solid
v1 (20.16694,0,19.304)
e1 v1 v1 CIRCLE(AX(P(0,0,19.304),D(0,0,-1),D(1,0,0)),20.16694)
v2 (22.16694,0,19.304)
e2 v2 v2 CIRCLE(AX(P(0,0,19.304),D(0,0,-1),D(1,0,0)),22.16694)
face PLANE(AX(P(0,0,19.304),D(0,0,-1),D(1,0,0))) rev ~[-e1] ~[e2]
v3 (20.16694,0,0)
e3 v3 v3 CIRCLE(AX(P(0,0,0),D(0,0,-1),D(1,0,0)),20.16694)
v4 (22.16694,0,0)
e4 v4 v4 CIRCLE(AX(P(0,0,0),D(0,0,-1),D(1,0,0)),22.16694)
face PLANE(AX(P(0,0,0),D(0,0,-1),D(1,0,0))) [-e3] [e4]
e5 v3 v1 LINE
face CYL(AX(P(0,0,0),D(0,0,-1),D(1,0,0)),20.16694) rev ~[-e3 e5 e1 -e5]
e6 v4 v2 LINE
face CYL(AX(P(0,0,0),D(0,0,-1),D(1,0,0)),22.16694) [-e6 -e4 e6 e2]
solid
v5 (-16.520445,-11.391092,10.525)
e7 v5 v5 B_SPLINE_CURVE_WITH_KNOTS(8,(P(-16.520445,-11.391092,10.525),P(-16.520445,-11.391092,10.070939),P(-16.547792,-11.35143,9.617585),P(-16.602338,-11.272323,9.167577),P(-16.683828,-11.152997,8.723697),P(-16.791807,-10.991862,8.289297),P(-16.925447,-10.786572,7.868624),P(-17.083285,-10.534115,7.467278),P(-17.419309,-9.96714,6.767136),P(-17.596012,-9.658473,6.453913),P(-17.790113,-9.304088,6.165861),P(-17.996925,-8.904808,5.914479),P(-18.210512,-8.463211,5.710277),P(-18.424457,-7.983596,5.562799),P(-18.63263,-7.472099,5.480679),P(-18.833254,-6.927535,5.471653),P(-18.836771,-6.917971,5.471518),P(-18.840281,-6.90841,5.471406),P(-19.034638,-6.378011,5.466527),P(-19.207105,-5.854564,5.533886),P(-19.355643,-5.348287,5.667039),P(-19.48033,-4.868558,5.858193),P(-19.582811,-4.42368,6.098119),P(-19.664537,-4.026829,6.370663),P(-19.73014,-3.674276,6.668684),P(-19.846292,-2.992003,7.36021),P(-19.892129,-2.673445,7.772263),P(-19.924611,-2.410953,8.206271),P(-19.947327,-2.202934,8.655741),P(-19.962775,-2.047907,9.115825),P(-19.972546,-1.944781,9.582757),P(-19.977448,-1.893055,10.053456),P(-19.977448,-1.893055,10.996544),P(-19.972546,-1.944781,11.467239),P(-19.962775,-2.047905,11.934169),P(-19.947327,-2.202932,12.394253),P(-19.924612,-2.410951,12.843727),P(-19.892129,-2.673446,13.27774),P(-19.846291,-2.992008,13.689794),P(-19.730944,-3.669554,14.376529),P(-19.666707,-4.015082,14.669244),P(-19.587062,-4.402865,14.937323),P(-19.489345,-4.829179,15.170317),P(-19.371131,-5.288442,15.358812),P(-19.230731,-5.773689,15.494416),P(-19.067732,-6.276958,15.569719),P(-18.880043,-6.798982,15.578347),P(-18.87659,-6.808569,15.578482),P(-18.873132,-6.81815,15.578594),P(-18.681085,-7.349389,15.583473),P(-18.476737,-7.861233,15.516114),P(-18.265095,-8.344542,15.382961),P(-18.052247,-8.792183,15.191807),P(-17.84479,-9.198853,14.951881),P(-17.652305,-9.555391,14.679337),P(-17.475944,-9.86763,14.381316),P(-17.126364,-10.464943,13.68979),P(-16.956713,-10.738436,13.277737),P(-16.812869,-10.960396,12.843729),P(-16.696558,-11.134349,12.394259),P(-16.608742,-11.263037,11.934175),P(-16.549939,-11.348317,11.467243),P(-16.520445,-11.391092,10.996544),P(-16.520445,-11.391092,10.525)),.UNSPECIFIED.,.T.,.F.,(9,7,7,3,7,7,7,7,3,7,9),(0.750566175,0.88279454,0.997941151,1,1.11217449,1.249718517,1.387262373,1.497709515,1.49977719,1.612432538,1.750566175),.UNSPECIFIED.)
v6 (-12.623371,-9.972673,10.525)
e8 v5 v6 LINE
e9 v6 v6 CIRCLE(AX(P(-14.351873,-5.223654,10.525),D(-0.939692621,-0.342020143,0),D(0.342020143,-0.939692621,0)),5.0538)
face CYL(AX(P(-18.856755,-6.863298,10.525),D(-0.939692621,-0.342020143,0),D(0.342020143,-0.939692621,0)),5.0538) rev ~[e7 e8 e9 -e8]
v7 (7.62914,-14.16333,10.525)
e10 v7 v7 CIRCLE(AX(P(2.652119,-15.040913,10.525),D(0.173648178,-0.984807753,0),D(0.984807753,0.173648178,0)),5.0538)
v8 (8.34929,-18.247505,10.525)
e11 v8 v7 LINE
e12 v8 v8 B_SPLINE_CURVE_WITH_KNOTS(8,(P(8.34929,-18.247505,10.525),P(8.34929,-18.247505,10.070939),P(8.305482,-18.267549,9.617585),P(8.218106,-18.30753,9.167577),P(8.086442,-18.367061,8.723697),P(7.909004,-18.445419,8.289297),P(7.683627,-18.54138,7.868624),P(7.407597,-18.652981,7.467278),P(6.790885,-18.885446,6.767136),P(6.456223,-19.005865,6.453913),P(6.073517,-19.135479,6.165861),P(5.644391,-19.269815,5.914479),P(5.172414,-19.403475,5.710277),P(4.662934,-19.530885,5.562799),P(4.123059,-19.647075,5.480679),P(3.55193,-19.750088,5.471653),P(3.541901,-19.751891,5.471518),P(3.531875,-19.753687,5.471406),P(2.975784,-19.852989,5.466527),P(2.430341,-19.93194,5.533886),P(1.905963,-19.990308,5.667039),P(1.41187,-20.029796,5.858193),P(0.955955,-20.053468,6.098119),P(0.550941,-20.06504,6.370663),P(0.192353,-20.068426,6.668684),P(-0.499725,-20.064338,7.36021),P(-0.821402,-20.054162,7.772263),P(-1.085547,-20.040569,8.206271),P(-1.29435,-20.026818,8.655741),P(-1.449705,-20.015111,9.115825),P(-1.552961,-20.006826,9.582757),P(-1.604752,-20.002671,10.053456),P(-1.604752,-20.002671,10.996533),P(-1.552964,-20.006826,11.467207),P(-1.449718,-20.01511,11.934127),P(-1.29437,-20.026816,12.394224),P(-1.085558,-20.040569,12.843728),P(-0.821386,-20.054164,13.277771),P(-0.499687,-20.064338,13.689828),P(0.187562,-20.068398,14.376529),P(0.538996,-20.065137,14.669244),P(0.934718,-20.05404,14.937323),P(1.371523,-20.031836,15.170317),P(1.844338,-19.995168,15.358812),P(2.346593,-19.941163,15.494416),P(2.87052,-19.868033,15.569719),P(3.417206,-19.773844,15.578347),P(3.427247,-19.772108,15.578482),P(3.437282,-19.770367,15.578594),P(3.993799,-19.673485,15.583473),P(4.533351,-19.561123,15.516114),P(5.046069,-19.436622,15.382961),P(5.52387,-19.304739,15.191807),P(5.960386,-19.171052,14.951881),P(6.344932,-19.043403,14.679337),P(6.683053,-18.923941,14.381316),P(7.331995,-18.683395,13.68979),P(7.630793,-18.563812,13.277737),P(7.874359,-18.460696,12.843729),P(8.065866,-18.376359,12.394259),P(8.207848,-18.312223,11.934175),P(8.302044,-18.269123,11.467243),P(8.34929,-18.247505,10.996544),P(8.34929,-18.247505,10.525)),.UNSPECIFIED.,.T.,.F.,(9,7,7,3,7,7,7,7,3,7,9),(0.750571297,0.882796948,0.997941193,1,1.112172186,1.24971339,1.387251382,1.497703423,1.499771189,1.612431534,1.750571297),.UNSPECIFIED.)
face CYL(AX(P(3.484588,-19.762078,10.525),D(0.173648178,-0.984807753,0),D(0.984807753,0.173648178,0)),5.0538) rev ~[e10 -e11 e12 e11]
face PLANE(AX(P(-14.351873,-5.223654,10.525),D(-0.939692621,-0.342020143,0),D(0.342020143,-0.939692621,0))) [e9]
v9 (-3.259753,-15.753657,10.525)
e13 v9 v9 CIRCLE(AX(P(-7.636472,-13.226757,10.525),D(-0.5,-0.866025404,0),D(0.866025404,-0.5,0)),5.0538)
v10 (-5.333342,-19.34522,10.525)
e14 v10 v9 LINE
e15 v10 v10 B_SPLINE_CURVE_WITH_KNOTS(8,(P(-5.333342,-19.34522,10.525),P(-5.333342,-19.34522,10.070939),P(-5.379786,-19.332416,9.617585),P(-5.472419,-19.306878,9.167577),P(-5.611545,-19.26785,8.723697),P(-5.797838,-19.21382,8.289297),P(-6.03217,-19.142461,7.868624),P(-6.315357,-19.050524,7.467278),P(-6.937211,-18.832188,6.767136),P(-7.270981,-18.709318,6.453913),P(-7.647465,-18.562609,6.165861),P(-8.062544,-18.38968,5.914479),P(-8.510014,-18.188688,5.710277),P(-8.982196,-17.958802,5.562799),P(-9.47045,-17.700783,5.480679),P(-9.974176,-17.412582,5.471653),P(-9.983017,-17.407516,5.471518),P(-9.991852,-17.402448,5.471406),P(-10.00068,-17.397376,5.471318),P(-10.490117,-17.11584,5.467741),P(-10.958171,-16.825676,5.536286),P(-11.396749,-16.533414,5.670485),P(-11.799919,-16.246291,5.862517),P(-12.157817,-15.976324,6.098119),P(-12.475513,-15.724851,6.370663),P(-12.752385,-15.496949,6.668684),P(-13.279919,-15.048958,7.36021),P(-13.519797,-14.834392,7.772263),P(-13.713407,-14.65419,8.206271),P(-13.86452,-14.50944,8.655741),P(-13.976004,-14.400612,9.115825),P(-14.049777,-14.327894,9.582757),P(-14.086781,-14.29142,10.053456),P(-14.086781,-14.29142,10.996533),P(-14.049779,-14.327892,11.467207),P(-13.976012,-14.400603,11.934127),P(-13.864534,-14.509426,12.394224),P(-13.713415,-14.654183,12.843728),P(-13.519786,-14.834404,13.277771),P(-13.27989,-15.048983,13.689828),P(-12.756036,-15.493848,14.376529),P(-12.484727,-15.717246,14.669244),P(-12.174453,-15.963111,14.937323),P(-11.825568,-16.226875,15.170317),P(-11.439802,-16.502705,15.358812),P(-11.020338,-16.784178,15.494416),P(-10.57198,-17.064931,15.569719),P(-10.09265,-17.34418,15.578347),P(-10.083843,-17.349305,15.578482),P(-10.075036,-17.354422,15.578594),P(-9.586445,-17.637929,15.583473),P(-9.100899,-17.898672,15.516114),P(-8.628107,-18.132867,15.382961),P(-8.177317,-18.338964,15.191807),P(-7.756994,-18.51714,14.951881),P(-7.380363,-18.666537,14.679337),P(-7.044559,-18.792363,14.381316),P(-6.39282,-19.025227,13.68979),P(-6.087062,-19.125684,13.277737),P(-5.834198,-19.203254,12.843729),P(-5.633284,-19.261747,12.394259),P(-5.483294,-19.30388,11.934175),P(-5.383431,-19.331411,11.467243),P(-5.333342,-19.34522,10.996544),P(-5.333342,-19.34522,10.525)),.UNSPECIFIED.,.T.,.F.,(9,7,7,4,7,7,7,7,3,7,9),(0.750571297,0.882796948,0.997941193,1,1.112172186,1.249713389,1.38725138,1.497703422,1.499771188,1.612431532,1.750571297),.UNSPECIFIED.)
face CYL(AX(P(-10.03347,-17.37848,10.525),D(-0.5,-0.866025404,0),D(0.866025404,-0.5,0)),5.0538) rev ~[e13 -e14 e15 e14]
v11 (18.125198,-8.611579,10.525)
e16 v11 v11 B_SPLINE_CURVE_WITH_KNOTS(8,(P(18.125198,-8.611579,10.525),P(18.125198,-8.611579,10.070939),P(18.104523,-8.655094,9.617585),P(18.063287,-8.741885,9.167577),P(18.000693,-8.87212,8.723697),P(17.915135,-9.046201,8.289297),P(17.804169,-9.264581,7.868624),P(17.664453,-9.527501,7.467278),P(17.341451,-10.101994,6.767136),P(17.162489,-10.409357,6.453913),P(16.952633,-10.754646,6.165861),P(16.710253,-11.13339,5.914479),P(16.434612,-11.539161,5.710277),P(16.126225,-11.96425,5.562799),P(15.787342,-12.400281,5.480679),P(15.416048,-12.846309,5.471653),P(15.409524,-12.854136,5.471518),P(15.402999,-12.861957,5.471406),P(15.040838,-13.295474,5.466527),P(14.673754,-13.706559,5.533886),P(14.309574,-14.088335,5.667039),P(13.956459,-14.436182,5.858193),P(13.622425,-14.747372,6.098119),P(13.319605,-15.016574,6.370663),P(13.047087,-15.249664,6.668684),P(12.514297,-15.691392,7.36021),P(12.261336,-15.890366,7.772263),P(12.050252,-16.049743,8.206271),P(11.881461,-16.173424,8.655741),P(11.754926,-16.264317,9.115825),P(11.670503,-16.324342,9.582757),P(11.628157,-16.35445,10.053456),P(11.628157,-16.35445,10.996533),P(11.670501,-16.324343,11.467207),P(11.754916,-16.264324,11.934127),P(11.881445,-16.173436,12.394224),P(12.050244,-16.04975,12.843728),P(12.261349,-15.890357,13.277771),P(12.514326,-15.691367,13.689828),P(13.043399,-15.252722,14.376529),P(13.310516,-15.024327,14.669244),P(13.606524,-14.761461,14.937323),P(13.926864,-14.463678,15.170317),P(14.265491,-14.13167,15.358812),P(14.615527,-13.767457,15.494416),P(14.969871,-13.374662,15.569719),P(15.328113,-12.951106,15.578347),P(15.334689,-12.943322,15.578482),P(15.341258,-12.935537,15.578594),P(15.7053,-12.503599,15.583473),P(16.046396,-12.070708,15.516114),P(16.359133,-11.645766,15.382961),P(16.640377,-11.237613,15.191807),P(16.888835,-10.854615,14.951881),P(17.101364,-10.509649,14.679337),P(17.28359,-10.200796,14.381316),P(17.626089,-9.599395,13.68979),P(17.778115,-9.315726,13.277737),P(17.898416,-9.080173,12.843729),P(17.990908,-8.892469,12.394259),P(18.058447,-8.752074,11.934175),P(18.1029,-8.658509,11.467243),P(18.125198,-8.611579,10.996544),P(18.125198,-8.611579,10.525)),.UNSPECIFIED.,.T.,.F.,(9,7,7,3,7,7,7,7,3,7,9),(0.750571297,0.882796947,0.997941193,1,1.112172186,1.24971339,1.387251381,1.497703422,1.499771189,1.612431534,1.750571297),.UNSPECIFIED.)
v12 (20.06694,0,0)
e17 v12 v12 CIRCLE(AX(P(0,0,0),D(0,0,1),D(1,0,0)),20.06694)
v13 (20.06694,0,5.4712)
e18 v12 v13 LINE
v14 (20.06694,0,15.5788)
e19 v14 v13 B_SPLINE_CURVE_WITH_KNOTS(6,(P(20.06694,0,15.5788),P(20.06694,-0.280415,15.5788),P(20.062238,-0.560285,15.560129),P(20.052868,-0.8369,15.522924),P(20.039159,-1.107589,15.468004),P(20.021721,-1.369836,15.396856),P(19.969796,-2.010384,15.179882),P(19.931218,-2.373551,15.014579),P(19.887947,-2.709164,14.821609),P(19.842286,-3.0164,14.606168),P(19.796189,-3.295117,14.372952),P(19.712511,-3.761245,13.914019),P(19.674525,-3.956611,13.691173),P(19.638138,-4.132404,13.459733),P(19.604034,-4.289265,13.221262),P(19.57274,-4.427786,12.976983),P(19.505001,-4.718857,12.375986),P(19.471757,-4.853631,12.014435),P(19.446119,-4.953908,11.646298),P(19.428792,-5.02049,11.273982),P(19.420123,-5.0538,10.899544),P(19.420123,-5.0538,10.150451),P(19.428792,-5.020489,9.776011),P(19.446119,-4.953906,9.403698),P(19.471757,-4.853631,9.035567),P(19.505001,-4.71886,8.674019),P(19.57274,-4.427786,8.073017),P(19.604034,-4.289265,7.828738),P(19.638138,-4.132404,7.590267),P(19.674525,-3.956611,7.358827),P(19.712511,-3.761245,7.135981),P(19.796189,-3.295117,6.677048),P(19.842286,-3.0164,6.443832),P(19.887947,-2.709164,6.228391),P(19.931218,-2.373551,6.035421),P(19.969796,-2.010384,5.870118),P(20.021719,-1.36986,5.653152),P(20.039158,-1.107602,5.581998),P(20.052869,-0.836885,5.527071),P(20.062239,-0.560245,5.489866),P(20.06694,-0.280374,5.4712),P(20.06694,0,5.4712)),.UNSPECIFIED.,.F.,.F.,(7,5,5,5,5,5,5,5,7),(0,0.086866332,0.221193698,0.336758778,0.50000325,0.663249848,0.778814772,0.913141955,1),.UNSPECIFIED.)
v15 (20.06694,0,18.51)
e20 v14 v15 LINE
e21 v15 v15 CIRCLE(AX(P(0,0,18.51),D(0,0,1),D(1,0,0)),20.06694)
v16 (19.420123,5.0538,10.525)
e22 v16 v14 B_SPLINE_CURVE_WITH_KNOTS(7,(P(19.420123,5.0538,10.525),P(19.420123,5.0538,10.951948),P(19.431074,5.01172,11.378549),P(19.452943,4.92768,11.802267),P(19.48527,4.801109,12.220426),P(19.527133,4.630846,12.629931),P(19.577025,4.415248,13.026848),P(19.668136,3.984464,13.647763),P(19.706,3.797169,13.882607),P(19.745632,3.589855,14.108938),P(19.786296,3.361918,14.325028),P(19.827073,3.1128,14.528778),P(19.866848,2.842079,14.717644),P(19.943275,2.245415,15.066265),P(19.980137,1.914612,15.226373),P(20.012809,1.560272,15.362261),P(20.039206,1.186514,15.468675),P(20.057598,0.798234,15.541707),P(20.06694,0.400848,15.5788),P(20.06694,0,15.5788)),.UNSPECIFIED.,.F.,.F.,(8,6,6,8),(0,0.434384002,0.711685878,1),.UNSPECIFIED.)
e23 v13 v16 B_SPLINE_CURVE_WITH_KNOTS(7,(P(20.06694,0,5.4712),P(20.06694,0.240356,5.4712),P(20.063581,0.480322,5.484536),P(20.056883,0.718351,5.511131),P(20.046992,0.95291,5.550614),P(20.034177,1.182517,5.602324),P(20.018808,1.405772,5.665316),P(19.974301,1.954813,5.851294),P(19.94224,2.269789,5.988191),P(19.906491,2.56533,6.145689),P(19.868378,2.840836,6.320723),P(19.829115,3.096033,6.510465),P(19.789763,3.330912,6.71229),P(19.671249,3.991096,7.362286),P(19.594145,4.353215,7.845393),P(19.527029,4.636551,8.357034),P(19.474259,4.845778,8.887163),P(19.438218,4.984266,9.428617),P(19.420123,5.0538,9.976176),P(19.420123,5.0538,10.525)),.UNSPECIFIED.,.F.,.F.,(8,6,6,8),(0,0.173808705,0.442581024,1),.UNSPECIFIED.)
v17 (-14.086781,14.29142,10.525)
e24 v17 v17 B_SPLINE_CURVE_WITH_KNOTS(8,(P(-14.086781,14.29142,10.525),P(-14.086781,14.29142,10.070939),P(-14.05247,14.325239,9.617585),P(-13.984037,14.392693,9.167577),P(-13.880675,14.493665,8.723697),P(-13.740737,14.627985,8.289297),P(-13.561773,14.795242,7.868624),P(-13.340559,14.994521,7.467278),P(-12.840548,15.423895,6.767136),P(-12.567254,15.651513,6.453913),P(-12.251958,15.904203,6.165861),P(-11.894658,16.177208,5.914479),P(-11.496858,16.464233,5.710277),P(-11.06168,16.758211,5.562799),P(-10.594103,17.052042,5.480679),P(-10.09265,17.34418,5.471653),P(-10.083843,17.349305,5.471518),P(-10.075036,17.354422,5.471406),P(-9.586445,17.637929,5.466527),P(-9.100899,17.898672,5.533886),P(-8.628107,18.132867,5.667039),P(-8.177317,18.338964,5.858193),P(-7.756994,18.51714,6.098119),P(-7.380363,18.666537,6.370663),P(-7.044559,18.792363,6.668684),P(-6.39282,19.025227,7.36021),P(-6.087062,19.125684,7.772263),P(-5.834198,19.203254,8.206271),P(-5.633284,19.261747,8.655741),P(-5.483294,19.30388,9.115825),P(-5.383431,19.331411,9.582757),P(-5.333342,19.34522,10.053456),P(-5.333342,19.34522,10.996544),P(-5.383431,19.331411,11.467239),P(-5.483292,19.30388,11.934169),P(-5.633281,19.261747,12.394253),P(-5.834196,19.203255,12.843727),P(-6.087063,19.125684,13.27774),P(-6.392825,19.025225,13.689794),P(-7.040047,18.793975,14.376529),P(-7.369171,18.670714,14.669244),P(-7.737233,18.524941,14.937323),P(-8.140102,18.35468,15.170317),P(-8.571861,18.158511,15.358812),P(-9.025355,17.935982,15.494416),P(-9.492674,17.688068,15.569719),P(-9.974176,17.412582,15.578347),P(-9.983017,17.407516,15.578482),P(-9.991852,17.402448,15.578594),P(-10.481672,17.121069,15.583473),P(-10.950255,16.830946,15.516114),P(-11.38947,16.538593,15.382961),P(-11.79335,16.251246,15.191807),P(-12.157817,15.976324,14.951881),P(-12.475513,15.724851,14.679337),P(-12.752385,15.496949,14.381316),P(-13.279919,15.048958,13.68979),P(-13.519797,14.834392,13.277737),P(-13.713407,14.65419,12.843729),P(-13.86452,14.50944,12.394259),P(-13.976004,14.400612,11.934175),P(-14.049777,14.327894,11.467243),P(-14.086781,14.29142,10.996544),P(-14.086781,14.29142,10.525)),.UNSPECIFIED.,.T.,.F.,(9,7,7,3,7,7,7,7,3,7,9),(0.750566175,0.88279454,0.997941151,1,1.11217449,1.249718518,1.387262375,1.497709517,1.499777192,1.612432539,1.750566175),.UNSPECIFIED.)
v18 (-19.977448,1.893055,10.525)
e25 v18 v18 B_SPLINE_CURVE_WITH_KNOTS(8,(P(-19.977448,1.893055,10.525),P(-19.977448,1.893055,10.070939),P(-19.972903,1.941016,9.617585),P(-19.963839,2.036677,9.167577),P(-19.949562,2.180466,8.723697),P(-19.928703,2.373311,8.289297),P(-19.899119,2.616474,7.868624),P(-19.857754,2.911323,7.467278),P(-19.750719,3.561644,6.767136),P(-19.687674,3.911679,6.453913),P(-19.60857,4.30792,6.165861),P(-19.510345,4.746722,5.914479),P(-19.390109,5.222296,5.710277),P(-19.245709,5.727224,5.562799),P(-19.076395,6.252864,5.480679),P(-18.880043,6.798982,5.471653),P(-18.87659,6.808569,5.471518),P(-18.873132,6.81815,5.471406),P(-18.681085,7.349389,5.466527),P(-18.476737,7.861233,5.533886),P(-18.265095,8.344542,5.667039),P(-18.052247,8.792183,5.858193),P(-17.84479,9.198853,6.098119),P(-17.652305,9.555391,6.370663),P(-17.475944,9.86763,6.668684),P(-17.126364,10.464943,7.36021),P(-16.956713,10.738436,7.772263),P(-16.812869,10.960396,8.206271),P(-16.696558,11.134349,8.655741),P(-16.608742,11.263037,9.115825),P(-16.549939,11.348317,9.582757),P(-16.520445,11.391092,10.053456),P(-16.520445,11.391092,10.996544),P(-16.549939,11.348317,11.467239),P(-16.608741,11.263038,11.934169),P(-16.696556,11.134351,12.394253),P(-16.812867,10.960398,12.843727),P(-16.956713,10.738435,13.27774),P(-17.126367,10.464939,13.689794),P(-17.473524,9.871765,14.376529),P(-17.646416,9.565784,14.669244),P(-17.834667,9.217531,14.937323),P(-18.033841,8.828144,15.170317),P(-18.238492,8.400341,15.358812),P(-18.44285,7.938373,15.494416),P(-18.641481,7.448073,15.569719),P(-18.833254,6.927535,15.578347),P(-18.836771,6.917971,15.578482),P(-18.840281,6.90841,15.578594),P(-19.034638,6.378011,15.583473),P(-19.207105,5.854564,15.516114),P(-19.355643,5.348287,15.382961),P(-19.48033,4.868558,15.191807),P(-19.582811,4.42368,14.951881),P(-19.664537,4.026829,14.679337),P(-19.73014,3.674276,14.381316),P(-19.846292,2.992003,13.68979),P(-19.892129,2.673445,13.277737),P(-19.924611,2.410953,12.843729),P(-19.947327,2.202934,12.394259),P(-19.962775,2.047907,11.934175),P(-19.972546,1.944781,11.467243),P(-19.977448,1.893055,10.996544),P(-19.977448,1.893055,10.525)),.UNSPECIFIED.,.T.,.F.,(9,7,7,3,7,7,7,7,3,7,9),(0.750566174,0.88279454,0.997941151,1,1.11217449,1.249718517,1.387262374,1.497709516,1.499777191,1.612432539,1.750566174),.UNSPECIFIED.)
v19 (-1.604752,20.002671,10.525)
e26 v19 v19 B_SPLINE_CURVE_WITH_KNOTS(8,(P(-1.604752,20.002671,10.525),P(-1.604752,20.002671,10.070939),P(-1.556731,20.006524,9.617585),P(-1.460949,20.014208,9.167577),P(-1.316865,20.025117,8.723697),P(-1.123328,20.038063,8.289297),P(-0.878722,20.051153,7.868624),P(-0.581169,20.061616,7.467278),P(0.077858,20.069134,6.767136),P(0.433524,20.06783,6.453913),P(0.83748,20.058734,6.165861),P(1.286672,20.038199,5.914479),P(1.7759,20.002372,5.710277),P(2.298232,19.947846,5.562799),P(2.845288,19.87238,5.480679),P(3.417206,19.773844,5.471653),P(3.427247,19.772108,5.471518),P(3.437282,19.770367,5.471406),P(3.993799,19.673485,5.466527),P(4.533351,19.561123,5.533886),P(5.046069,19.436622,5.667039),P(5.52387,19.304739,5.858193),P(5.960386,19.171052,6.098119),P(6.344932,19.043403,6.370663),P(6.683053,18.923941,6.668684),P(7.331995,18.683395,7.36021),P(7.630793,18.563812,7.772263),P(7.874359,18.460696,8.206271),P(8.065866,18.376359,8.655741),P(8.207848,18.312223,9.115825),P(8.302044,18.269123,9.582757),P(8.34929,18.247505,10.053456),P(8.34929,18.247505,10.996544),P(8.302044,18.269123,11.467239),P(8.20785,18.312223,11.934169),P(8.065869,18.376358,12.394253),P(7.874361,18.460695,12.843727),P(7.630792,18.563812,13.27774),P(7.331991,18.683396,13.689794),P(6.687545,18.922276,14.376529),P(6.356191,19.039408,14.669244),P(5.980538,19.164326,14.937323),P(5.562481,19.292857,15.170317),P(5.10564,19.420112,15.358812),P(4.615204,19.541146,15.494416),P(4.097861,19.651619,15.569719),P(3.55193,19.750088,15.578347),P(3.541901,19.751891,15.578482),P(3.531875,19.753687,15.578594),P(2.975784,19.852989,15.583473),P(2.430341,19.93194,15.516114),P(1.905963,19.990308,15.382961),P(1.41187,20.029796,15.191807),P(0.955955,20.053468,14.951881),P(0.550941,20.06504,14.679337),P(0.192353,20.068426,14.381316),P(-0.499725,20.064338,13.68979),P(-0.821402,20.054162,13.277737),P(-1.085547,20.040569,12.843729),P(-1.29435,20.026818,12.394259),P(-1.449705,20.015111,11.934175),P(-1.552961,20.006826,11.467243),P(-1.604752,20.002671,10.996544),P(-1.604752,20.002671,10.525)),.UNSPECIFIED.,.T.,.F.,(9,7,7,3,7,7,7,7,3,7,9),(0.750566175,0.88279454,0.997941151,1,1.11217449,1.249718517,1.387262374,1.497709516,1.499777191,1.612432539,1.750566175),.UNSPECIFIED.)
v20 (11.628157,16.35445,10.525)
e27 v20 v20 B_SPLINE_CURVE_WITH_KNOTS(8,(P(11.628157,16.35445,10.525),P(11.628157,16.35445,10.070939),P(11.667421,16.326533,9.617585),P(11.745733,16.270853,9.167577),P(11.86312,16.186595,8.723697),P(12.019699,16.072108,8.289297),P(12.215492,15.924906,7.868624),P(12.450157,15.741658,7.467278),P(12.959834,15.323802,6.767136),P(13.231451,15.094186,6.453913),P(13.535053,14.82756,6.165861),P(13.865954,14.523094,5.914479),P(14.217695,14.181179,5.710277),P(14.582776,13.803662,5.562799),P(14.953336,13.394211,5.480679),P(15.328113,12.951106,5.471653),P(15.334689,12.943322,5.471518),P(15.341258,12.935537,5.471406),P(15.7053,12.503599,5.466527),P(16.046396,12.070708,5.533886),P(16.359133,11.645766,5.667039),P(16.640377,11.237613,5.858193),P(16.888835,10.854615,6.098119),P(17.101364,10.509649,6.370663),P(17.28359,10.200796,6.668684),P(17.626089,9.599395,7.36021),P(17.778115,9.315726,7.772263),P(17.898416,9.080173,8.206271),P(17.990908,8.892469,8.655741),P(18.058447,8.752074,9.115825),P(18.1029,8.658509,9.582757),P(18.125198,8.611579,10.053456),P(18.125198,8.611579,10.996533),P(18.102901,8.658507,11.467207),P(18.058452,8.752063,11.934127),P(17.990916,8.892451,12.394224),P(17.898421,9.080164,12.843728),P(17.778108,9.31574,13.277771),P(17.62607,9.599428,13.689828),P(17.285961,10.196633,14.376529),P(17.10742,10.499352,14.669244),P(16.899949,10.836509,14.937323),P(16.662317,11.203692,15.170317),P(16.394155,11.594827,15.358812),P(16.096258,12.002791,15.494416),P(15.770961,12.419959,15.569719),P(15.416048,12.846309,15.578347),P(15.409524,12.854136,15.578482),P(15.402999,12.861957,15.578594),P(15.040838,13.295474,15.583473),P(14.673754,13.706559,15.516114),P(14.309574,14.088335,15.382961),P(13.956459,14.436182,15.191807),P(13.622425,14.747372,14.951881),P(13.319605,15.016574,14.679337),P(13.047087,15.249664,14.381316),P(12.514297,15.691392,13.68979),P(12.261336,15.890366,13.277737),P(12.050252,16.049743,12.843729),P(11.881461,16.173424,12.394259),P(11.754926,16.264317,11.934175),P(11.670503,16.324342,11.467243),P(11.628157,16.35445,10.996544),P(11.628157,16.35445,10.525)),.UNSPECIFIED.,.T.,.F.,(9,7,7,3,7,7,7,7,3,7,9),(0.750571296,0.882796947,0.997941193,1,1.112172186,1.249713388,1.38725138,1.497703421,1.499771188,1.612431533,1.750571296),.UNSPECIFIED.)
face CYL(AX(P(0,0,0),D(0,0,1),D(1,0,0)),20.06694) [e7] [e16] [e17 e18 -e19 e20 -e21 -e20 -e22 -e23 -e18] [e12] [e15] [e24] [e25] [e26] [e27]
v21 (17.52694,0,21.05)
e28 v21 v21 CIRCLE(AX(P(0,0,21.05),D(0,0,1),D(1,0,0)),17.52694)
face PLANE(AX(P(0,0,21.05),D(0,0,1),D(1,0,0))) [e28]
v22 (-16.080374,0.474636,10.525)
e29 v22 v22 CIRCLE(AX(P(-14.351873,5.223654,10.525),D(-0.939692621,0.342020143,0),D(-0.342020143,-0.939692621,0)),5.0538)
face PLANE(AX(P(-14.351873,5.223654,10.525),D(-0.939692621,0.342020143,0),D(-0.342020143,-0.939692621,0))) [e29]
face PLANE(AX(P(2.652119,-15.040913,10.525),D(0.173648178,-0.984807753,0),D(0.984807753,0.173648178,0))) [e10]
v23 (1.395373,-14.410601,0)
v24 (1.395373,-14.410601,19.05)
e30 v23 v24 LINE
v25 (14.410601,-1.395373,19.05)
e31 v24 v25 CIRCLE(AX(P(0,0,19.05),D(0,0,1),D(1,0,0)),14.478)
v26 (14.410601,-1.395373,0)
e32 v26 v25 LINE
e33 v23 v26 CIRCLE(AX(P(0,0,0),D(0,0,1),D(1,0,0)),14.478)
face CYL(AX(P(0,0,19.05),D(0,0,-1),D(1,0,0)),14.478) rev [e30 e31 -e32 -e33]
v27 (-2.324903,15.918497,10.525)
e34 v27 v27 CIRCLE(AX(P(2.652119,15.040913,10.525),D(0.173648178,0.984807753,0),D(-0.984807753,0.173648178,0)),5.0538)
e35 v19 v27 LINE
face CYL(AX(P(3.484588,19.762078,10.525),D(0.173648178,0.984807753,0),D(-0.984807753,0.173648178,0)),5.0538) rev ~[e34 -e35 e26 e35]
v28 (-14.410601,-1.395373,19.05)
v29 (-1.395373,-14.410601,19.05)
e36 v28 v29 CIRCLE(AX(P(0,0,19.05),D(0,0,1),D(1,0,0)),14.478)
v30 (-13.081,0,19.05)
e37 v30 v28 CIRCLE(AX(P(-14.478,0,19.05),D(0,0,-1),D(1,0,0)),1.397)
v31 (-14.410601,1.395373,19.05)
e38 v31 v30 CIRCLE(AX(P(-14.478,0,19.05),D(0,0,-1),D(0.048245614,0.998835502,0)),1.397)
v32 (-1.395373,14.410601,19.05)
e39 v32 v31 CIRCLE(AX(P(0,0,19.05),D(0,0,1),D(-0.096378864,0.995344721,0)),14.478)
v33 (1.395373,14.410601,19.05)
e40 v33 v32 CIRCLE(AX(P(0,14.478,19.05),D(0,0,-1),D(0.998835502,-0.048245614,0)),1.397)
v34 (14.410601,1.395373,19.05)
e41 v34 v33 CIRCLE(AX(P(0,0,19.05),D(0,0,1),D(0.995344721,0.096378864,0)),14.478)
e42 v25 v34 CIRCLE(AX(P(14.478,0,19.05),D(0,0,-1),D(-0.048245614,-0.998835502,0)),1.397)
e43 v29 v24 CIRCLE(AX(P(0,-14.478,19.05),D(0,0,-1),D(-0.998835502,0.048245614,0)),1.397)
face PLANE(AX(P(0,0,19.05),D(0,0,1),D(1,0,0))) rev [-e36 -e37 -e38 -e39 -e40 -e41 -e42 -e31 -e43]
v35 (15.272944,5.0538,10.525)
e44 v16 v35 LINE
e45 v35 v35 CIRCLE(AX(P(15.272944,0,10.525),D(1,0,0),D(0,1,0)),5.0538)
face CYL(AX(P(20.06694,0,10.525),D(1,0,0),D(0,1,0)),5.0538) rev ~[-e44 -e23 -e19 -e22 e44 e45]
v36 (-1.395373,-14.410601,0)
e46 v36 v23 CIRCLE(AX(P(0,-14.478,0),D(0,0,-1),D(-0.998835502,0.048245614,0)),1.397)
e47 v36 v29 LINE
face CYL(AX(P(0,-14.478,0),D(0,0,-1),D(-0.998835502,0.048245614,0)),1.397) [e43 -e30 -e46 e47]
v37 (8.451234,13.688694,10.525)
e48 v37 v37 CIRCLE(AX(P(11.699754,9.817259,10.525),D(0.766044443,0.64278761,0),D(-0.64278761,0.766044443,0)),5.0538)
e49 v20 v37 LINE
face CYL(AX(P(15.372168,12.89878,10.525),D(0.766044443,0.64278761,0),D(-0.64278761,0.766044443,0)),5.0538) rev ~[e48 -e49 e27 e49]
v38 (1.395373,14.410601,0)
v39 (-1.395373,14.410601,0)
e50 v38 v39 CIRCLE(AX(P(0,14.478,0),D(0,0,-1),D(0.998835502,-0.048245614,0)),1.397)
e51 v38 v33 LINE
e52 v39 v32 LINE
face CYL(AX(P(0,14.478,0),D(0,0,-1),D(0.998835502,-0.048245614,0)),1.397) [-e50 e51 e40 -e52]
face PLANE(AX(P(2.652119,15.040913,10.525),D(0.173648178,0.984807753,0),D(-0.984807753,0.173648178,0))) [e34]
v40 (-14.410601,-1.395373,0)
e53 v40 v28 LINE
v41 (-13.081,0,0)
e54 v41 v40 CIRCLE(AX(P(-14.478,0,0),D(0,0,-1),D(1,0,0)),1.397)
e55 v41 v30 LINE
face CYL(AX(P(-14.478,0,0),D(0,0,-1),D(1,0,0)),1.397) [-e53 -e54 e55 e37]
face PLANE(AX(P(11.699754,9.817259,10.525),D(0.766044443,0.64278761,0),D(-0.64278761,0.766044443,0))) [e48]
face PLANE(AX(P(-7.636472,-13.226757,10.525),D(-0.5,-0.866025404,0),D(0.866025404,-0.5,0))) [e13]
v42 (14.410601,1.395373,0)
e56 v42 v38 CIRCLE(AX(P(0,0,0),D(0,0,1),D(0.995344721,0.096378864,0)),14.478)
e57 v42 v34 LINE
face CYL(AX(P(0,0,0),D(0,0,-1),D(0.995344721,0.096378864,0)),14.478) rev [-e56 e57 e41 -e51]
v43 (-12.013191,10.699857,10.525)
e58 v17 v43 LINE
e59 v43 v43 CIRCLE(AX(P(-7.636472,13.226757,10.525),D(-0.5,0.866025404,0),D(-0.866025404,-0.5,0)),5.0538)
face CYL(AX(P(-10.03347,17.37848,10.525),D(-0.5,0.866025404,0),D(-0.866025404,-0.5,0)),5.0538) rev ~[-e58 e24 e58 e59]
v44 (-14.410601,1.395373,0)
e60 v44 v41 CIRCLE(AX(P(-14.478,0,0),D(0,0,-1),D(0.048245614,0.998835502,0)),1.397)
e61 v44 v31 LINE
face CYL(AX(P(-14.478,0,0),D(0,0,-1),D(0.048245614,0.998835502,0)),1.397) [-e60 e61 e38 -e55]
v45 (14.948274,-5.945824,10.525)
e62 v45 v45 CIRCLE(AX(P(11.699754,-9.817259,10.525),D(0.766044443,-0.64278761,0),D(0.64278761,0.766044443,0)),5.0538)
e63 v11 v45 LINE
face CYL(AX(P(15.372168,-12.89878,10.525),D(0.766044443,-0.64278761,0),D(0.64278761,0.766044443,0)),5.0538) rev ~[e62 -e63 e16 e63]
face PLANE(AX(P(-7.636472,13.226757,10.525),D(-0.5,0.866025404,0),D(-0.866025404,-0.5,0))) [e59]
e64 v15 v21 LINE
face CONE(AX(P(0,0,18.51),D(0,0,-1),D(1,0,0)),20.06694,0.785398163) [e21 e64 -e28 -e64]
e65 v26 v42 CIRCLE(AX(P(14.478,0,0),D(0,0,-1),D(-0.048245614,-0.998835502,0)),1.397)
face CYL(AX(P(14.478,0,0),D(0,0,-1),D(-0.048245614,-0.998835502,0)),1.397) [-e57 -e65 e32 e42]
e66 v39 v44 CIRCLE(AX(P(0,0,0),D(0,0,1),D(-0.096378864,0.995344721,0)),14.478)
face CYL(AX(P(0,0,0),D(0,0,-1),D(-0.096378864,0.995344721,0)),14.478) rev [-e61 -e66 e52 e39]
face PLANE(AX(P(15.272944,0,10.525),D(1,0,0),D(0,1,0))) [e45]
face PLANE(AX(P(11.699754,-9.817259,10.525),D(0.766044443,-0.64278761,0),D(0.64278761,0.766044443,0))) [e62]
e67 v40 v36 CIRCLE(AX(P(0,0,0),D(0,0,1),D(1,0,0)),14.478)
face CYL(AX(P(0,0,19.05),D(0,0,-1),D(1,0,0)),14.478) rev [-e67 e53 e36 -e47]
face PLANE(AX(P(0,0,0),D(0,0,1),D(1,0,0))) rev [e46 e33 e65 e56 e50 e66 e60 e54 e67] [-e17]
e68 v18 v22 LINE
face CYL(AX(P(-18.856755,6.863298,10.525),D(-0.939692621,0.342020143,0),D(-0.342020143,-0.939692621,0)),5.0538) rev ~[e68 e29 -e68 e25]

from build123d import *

# Parameters (mm, degrees)
F2_R      = 20.06694
F3_DEPTH  = 19.05
F5_R      = 5.0538
F6_DEPTH  = 4.793996
F7_COUNT  = 9
F9_SIZE   = 2.54
F10_R     = 22.16694
F10_R_2   = 20.16694
F11_DEPTH = 19.304


# Not quite as in the source:
# - a feature names something its author has since deleted; it is built from what else it names


with BuildPart() as f1:
    # F0 (on Front) → F1 (revolve)
    with BuildSketch(Plane.XZ):
        Polygon((0, 21.05), (0, 19.05), (14.478, 19.05), (14.478, 0), (20.06694, 0), (20.06694, 21.05), align=None)
    revolve(axis=Axis((0, 0, 5.8315382339), (0, 0, 1)))

    # F2 (on face) → F3 (join, through all)
    with BuildSketch(Plane(origin=(0, 0, 0), x_dir=(1, 0, 0), z_dir=(0, 0, -1))):
        Circle(F2_R)
        with BuildLine():
            ThreePointArc((1.3953731968, 14.4106008772), (10.237491978, 10.237491978), (14.4106008772, 1.3953731968))
            ThreePointArc((14.4106008772, 1.3953731968), (15.4417044219, 1.0113766792), (15.875, 0))
            ThreePointArc((15.875, 0), (15.4417044219, -1.0113766792), (14.4106008772, -1.3953731968))
            ThreePointArc((14.4106008772, -1.3953731968), (10.237491978, -10.237491978), (1.3953731968, -14.4106008772))
            ThreePointArc((1.3953731968, -14.4106008772), (1.39659324, -14.4442906235), (1.397, -14.478))
            ThreePointArc((1.397, -14.478), (-0.0337093765, -15.87459324), (-1.3953731968, -14.4106008772))
            ThreePointArc((-1.3953731968, -14.4106008772), (-10.237491978, -10.237491978), (-14.4106008772, -1.3953731968))
            ThreePointArc((-14.4106008772, -1.3953731968), (-15.875, 0), (-14.4106008772, 1.3953731968))
            ThreePointArc((-14.4106008772, 1.3953731968), (-10.237491978, 10.237491978), (-1.3953731968, 14.4106008772))
            ThreePointArc((-1.3953731968, 14.4106008772), (-0.0337093765, 15.87459324), (1.397, 14.478))
            ThreePointArc((1.397, 14.478), (1.39659324, 14.4442906235), (1.3953731968, 14.4106008772))
        make_face(mode=Mode.SUBTRACT)
        with BuildLine():
            ThreePointArc((-1.3953731968, 14.4106008772), (0, 13.081), (1.3953731968, 14.4106008772))
            ThreePointArc((1.3953731968, 14.4106008772), (0, 14.478), (-1.3953731968, 14.4106008772))
        make_face()
        with BuildLine():
            ThreePointArc((14.4106008772, -1.3953731968), (14.4611404028, -0.6985), (14.478, 0))
            ThreePointArc((14.478, 0), (14.4611404028, 0.6985), (14.4106008772, 1.3953731968))
            ThreePointArc((14.4106008772, 1.3953731968), (13.081, 0), (14.4106008772, -1.3953731968))
        make_face()
        with BuildLine():
            ThreePointArc((14.4106008772, 1.3953731968), (14.4611404028, 0.6985), (14.478, 0))
            ThreePointArc((14.478, 0), (14.4611404028, -0.6985), (14.4106008772, -1.3953731968))
            ThreePointArc((14.4106008772, -1.3953731968), (15.4417044219, -1.0113766792), (15.875, 0))
            ThreePointArc((15.875, 0), (15.4417044219, 1.0113766792), (14.4106008772, 1.3953731968))
        make_face()
        with BuildLine():
            ThreePointArc((-1.3953731968, -14.4106008772), (0, -14.478), (1.3953731968, -14.4106008772))
            ThreePointArc((1.3953731968, -14.4106008772), (0, -13.081), (-1.3953731968, -14.4106008772))
        make_face()
        with BuildLine():
            ThreePointArc((1.397, -14.478), (1.39659324, -14.4442906235), (1.3953731968, -14.4106008772))
            ThreePointArc((1.3953731968, -14.4106008772), (0, -14.478), (-1.3953731968, -14.4106008772))
            ThreePointArc((-1.3953731968, -14.4106008772), (-0.0337093765, -15.87459324), (1.397, -14.478))
        make_face()
        with BuildLine():
            ThreePointArc((-14.4106008772, -1.3953731968), (-14.478, 0), (-14.4106008772, 1.3953731968))
            ThreePointArc((-14.4106008772, 1.3953731968), (-15.875, 0), (-14.4106008772, -1.3953731968))
        make_face()
        with BuildLine():
            ThreePointArc((-13.081, 0), (-13.4666233208, 0.9637044219), (-14.4106008772, 1.3953731968))
            ThreePointArc((-14.4106008772, 1.3953731968), (-14.478, 0), (-14.4106008772, -1.3953731968))
            ThreePointArc((-14.4106008772, -1.3953731968), (-13.4666233208, -0.9637044219), (-13.081, 0))
        make_face()
    extrude(amount=-F3_DEPTH)


with BuildPart() as f6:
    # F5 (on offset) → F6 (new body)
    with BuildSketch(Plane.YZ.offset(20.0669398)):
        with Locations((0, 10.525)):
            Circle(F5_R)
    extrude(amount=-F6_DEPTH)


with BuildPart() as f7_1:
    # F7: instance of F6
    add(f6.part.rotate(Axis((0, 0, 5.8315382339), (0, 0, 1)), 1 * 360 / F7_COUNT))


with BuildPart() as f7_2:
    # F7: instance of F6
    add(f6.part.rotate(Axis((0, 0, 5.8315382339), (0, 0, 1)), 2 * 360 / F7_COUNT))


with BuildPart() as f7_3:
    # F7: instance of F6
    add(f6.part.rotate(Axis((0, 0, 5.8315382339), (0, 0, 1)), 3 * 360 / F7_COUNT))


with BuildPart() as f7_4:
    # F7: instance of F6
    add(f6.part.rotate(Axis((0, 0, 5.8315382339), (0, 0, 1)), 4 * 360 / F7_COUNT))


with BuildPart() as f7_5:
    # F7: instance of F6
    add(f6.part.rotate(Axis((0, 0, 5.8315382339), (0, 0, 1)), 5 * 360 / F7_COUNT))


with BuildPart() as f7_6:
    # F7: instance of F6
    add(f6.part.rotate(Axis((0, 0, 5.8315382339), (0, 0, 1)), 6 * 360 / F7_COUNT))


with BuildPart() as f7_7:
    # F7: instance of F6
    add(f6.part.rotate(Axis((0, 0, 5.8315382339), (0, 0, 1)), 7 * 360 / F7_COUNT))


with BuildPart() as f7_8:
    # F7: instance of F6
    add(f6.part.rotate(Axis((0, 0, 5.8315382339), (0, 0, 1)), 8 * 360 / F7_COUNT))


with BuildPart() as f1_1:
    add(f1.part)

    # F8: cut F6, F7_2, F7_4, F7_6, F7_8, F7_7, F7_5, F7_3, F7_1
    add(f6.part, mode=Mode.SUBTRACT)
    add(f7_2.part, mode=Mode.SUBTRACT)
    add(f7_4.part, mode=Mode.SUBTRACT)
    add(f7_6.part, mode=Mode.SUBTRACT)
    add(f7_8.part, mode=Mode.SUBTRACT)
    add(f7_7.part, mode=Mode.SUBTRACT)
    add(f7_5.part, mode=Mode.SUBTRACT)
    add(f7_3.part, mode=Mode.SUBTRACT)
    add(f7_1.part, mode=Mode.SUBTRACT)

    # F9
    f9_edges = [f1_1.edges().sort_by_distance(p)[0] for p in [
        (-20.06694, 0, 21.05),
    ]]
    chamfer(f9_edges, length=F9_SIZE)


with BuildPart() as f11:
    # F10 (on face) → F11 (new body)
    with BuildSketch(Plane(origin=(0, 0, 0), x_dir=(1, 0, 0), z_dir=(0, 0, -1))):
        Circle(F10_R)
        Circle(F10_R_2, mode=Mode.SUBTRACT)
    extrude(amount=-F11_DEPTH)


solid = Compound([f1_1.part, f11.part])
